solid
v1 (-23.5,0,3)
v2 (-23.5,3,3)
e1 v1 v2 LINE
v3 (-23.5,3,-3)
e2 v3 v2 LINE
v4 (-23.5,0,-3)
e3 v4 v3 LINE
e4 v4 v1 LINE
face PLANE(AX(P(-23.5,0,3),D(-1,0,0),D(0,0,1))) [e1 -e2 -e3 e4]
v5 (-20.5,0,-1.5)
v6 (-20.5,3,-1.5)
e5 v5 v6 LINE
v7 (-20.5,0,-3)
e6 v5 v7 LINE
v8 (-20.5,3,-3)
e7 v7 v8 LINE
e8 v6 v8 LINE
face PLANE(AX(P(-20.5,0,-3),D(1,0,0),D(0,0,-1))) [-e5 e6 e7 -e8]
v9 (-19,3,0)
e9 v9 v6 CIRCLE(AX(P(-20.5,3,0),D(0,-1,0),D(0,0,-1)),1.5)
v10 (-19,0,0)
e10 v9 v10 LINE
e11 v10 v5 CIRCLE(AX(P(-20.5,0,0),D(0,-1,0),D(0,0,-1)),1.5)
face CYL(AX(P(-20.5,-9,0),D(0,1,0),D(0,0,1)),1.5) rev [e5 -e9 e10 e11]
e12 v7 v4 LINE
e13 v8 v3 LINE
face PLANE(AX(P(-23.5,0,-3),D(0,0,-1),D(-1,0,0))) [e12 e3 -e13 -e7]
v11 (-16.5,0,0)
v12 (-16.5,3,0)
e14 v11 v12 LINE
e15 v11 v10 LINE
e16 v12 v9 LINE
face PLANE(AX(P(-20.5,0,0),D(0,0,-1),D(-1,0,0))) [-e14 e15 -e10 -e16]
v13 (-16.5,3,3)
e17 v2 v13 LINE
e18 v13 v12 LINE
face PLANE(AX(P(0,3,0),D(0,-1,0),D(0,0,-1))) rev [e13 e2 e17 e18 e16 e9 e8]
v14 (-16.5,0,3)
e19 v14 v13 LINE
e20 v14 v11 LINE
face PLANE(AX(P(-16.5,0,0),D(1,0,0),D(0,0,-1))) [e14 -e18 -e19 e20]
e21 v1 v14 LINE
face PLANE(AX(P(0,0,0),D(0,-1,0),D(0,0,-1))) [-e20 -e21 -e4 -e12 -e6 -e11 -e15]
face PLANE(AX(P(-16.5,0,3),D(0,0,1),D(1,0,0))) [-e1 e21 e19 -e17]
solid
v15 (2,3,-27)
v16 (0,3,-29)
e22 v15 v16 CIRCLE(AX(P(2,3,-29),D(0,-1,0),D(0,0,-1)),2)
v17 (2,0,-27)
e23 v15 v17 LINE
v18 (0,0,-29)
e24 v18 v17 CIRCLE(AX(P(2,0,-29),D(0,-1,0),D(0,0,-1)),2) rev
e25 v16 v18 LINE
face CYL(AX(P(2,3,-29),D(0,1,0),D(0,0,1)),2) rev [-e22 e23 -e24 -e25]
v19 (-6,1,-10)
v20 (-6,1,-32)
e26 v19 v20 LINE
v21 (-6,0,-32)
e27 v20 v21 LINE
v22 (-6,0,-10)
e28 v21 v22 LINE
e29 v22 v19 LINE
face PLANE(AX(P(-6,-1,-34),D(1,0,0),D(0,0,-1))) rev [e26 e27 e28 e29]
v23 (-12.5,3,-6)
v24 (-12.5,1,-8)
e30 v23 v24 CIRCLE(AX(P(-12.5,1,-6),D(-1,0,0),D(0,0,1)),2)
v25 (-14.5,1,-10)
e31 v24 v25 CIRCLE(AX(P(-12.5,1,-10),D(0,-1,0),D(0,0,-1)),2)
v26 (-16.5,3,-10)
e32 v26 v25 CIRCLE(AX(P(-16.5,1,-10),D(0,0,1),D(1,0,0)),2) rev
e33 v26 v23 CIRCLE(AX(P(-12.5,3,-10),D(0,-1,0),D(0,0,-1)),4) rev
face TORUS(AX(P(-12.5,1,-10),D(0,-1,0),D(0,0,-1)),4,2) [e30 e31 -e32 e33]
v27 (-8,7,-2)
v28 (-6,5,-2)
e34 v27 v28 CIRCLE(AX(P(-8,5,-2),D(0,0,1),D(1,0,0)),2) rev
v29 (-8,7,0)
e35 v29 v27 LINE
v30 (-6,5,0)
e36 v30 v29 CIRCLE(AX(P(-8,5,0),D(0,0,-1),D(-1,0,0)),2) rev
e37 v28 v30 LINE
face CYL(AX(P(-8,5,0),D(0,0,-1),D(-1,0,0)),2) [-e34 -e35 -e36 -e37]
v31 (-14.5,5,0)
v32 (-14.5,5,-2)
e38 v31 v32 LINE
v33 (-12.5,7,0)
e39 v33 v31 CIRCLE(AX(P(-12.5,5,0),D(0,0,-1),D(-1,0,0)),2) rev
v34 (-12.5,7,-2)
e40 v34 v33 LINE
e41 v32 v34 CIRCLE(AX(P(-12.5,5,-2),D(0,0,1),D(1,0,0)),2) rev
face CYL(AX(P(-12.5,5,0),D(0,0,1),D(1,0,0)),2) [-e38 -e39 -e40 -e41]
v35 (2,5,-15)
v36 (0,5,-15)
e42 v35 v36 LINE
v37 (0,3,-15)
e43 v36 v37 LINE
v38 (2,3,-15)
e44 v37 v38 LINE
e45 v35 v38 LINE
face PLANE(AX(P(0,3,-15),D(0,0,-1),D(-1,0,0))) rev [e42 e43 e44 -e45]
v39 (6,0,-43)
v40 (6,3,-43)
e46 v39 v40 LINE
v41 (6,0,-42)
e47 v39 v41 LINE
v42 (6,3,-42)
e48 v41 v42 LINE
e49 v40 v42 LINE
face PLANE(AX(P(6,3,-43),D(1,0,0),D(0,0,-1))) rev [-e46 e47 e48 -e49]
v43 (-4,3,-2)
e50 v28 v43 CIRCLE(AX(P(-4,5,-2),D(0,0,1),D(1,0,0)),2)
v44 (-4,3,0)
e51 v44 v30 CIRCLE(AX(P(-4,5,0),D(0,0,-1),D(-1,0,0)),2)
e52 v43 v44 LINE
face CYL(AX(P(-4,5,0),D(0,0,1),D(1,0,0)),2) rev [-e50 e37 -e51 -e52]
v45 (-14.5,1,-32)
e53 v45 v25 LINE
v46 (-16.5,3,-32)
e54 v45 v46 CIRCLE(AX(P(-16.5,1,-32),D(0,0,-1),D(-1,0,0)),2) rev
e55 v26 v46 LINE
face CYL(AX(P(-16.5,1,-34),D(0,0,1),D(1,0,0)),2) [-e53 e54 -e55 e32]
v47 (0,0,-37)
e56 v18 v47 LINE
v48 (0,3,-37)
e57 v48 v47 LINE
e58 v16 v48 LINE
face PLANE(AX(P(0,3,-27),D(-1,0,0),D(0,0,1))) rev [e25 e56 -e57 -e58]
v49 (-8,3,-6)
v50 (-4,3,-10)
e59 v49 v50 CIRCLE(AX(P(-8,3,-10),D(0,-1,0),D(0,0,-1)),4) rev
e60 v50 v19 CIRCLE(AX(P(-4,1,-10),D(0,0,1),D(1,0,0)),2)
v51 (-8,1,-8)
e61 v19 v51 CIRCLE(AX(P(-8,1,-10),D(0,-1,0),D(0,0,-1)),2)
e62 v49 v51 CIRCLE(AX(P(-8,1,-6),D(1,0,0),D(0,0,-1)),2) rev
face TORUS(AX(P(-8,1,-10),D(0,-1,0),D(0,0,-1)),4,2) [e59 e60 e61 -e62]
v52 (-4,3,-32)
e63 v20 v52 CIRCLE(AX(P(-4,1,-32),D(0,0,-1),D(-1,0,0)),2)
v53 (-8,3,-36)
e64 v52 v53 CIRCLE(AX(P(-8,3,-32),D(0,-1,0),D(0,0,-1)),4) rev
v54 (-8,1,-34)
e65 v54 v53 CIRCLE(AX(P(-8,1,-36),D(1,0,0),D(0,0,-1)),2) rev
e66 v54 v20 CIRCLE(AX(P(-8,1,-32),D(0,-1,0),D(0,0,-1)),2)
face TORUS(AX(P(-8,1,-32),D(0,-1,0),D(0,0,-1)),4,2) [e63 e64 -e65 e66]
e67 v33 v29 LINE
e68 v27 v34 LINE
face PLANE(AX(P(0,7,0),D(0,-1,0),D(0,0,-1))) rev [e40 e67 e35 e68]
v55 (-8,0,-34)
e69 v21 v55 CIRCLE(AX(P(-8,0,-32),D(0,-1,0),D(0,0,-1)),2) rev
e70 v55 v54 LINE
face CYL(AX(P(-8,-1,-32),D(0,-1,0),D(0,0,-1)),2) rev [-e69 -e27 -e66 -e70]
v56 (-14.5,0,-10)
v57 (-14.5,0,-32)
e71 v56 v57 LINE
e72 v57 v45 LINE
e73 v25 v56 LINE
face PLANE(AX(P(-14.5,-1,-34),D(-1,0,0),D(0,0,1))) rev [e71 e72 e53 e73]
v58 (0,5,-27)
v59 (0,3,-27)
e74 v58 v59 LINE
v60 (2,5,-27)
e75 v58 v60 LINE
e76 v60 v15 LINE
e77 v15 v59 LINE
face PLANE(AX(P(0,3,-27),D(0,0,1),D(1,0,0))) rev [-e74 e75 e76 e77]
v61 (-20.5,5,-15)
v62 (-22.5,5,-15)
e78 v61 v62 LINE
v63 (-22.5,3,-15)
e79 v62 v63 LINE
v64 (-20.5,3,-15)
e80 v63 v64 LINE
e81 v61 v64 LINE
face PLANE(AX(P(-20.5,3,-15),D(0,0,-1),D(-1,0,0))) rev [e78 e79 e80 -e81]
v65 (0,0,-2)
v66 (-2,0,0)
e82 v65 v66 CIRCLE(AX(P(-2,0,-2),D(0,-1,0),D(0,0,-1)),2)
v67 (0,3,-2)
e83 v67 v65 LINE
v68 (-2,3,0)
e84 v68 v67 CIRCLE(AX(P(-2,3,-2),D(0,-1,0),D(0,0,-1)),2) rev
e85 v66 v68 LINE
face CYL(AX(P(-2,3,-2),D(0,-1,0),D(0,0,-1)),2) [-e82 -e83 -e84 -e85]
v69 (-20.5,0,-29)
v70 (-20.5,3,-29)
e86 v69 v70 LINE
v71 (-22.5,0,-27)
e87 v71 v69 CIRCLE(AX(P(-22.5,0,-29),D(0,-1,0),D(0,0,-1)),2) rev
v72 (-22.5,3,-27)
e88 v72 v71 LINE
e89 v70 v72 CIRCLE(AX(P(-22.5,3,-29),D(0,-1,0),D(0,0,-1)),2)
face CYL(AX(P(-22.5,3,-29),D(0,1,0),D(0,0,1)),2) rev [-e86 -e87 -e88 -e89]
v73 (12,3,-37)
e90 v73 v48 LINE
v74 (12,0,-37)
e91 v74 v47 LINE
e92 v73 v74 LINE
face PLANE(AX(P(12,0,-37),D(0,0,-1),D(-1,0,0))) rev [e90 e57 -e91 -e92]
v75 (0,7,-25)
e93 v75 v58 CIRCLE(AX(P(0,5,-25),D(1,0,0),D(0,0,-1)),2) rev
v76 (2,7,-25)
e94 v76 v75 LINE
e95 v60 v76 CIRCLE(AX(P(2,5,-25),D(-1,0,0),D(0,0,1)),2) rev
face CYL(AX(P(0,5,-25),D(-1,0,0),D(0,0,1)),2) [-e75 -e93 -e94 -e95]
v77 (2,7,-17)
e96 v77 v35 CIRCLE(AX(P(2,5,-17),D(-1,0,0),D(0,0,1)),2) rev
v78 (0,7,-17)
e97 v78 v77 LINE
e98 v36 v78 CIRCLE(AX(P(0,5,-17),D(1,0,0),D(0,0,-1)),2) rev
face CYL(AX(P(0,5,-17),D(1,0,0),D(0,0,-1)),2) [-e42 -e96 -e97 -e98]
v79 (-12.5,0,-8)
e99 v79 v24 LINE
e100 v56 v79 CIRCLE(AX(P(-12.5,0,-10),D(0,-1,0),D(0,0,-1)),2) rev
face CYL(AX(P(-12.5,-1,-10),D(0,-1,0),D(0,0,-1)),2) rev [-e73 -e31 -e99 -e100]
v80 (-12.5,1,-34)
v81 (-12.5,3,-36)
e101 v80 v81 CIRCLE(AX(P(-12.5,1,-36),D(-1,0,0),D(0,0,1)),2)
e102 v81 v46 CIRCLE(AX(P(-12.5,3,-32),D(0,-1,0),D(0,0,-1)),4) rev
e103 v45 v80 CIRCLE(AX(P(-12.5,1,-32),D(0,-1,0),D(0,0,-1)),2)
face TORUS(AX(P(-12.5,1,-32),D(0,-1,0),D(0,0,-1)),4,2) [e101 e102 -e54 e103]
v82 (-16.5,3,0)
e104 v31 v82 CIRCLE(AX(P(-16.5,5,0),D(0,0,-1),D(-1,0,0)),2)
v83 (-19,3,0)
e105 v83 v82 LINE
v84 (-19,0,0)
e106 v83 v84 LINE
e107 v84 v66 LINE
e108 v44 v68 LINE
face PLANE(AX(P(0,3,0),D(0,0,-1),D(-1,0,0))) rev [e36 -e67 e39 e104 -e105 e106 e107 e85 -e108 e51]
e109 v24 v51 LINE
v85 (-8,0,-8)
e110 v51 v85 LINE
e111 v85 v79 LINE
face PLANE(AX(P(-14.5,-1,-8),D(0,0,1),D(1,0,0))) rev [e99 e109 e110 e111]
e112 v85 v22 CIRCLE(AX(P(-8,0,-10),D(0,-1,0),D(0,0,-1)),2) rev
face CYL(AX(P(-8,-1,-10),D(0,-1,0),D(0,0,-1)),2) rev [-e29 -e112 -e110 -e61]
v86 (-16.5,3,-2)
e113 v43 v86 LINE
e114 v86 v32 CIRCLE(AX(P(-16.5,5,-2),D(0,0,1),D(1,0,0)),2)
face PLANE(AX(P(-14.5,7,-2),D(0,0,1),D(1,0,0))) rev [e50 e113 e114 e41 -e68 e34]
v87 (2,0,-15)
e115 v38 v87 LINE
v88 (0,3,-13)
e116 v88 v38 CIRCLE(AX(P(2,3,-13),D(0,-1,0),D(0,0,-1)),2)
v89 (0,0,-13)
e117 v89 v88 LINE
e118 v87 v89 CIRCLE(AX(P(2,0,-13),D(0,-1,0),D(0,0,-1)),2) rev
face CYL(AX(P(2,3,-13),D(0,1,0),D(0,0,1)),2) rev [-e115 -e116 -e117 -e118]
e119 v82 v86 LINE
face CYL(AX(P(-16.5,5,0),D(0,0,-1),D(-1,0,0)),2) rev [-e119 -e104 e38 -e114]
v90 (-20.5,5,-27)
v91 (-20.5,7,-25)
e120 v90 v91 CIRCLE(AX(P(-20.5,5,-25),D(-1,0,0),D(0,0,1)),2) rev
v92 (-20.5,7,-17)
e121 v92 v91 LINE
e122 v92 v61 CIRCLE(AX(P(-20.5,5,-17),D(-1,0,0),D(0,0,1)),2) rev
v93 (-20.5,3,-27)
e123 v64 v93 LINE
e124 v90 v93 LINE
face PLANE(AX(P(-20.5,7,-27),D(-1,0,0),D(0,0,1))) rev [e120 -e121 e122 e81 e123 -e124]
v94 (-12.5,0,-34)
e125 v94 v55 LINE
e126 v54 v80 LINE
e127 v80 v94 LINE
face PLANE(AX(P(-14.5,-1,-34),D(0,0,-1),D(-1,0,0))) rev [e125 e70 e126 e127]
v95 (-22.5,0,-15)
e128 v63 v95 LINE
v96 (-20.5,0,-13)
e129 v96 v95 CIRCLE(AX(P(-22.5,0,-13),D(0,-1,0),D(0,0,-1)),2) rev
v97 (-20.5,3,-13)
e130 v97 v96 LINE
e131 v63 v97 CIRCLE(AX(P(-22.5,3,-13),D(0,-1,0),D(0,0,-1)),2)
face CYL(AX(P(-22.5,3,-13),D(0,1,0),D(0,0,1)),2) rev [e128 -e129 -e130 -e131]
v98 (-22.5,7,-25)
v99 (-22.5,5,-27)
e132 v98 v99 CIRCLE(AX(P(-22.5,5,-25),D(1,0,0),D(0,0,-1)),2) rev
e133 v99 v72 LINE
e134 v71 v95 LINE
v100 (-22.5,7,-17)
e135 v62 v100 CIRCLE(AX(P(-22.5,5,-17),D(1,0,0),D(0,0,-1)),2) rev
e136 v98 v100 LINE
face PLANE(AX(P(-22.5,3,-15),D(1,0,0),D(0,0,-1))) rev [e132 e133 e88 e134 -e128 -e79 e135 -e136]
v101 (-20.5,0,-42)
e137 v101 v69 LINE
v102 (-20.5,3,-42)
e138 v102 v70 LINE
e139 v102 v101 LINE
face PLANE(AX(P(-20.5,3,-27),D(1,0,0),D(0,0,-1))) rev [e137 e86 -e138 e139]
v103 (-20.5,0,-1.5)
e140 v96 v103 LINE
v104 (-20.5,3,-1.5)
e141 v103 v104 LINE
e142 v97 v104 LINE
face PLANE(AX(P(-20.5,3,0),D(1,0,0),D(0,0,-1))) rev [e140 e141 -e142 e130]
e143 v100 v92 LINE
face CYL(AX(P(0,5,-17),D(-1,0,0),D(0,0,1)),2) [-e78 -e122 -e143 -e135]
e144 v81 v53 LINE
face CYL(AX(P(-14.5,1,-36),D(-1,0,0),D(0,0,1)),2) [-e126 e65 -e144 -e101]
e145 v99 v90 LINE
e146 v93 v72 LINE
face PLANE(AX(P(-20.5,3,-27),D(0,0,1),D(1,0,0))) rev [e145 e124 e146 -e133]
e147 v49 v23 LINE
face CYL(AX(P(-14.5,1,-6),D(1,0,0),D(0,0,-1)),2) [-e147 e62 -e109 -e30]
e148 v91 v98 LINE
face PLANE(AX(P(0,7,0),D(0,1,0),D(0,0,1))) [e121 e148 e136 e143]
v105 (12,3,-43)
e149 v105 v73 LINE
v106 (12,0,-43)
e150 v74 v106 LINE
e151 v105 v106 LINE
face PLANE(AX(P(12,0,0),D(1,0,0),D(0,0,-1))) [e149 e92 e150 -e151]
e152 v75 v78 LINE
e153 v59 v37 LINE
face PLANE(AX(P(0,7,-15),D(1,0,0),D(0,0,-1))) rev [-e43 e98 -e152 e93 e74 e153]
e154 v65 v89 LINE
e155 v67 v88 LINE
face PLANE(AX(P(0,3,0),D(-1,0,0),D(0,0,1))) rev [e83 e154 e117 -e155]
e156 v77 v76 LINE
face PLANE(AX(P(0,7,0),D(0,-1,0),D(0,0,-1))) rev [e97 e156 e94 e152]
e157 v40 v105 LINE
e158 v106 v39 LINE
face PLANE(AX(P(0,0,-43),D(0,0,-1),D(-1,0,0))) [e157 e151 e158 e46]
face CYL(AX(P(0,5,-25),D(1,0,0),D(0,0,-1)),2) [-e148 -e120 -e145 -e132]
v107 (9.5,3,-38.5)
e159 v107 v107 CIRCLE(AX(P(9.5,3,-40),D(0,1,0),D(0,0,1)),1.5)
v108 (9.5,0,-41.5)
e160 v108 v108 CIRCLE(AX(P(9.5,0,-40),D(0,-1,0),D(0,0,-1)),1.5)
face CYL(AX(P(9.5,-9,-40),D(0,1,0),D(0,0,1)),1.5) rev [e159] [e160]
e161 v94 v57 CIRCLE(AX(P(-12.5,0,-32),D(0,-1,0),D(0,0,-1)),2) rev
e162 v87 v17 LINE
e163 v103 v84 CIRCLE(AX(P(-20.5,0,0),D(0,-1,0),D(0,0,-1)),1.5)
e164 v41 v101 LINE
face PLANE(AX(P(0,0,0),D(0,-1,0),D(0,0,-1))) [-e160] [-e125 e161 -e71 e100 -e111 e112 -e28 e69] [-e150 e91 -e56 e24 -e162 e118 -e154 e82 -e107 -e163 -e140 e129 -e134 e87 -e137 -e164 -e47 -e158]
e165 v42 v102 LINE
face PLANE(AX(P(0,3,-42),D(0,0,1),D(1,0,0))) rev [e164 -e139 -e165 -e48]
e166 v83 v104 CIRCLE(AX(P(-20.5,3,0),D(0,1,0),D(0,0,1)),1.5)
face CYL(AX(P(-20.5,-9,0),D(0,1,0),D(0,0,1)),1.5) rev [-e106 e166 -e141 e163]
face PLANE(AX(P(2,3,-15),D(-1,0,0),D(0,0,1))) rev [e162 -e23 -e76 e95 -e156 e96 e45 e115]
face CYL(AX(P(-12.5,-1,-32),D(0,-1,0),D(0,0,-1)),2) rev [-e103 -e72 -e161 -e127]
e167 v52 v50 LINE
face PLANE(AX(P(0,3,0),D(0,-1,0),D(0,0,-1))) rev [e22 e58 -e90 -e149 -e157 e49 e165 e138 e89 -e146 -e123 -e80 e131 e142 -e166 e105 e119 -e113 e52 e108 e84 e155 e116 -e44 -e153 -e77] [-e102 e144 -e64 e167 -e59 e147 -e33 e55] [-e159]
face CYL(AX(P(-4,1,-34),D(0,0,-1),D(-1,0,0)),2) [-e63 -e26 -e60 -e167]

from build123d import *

# Parameters (mm, degrees)
EXTRUDE_1_DEPTH     = 3
SKETCH_3_W          = 8.5
SKETCH_3_H          = 2
EXTRUDE_2_DEPTH     = 4
SKETCH_4_W          = 2
SKETCH_4_H          = 12
EXTRUDE_3_DEPTH     = 4
FILLET_1_R          = 2
FILLET_2_R          = 2
FILLET_3_R          = 2
SKETCH_5_W          = 8.5
SKETCH_5_H          = 26
CUT_EXTRUDE_1_DEPTH = 4
FILLET_4_R          = 2
EXTRUDE_4_DEPTH     = 3
SKETCH_9_W          = 5
SKETCH_9_H          = 3
EXTRUDE_5_DEPTH     = 12
SKETCH_8_R          = 1.5
CUT_EXTRUDE_2_DEPTH = 12
SKETCH_10_W         = 6
SKETCH_10_H         = 3
EXTRUDE_6_DEPTH     = 1


with BuildPart() as part:
    # 草图1 → 凸台-拉伸1 (new body)
    with BuildSketch(Plane(origin=(0, 0, 0), x_dir=(1, 0, 0), z_dir=(0, 1, 0))):
        Polygon((0, 0), (-20.5, 0), (-20.5, 15), (-22.5, 15), (-22.5, 27), (-20.5, 27), (-20.5, 42), (0, 42), (0, 27), (2, 27), (2, 15), (0, 15), align=None)
    extrude(amount=EXTRUDE_1_DEPTH)

    # 草图3 → 凸台-拉伸2 (add)
    with BuildSketch(Plane(origin=(0, 3, 0), x_dir=(1, 0, 0), z_dir=(0, 1, 0))):
        with Locations((-10.25, 1)):
            Rectangle(SKETCH_3_W, SKETCH_3_H)
    extrude(amount=EXTRUDE_2_DEPTH)

    # 草图4 → 凸台-拉伸3 (add)
    with BuildSketch(Plane(origin=(0, 3, 0), x_dir=(1, 0, 0), z_dir=(0, 1, 0))):
        with Locations((-21.5, 21)):
            Rectangle(SKETCH_4_W, SKETCH_4_H)
        with Locations((1, 21)):
            Rectangle(SKETCH_4_W, SKETCH_4_H)
    extrude(amount=EXTRUDE_3_DEPTH)

    # 圆角1
    fillet_1_edges = [part.edges().sort_by_distance(p)[0] for p in [
        (-14.5, 7, -1),
        (-6, 7, -1),
        (-21.5, 7, -15),
        (-21.5, 7, -27),
        (1, 7, -15),
        (1, 7, -27),
    ]]
    fillet(fillet_1_edges, radius=FILLET_1_R)

    # 圆角2
    fillet_2_edges = [part.edges().sort_by_distance(p)[0] for p in [
        (0, 1.5, 0),
    ]]
    fillet(fillet_2_edges, radius=FILLET_2_R)

    # 圆角3
    # the kernel refuses this fillet: 2 mm, written as the material it adds along each edge
    with BuildSketch(Plane(origin=(-6, 3, 0), x_dir=(1, 0, 0), z_dir=(0, 0, -1)), Plane(origin=(-14.5, 3, -2), x_dir=(-1, 0, 0), z_dir=(0, 0, 1))) as fillet_3_piece_1:
        with BuildLine():
            CenterArc((FILLET_3_R, -FILLET_3_R), FILLET_3_R, 90, 90)
            Line((0, -FILLET_3_R), (0, 0))
            Line((0, 0), (FILLET_3_R, 0))
        make_face()
    extrude(amount=2)
    with BuildSketch(Plane(origin=(-20.5, 0, -15), x_dir=(0, 0, 1), z_dir=(0, 1, 0)), Plane(origin=(0, 0, -27), x_dir=(0, 0, -1), z_dir=(0, 1, 0))) as fillet_3_piece_2:
        with BuildLine():
            CenterArc((FILLET_3_R, -FILLET_3_R), FILLET_3_R, 90, 90)
            Line((0, -FILLET_3_R), (0, 0))
            Line((0, 0), (FILLET_3_R, 0))
        make_face()
    extrude(amount=3)
    with BuildSketch(Plane(origin=(-20.5, 0, -27), x_dir=(0, 0, -1), z_dir=(0, 1, 0)), Plane(origin=(0, 0, -15), x_dir=(0, 0, 1), z_dir=(0, 1, 0))) as fillet_3_piece_3:
        with BuildLine():
            CenterArc((FILLET_3_R, FILLET_3_R), FILLET_3_R, 180, 90)
            Line((0, FILLET_3_R), (0, 0))
            Line((0, 0), (FILLET_3_R, 0))
        make_face()
    extrude(amount=3)

    # 草图5 → 切除-拉伸1 (cut)
    with BuildSketch(Plane(origin=(0, 3, 0), x_dir=(1, 0, 0), z_dir=(0, 1, 0))):
        with Locations((-10.25, 21)):
            Rectangle(SKETCH_5_W, SKETCH_5_H)
    extrude(amount=-CUT_EXTRUDE_1_DEPTH, mode=Mode.SUBTRACT)

    # 圆角4
    fillet_4_edges = [part.edges().sort_by_distance(p)[0] for p in [
        (-14.5, 1.5, -8),
        (-14.5, 1.5, -34),
        (-6, 1.5, -34),
        (-6, 1.5, -8),
        (-14.5, 3, -21),
        (-10.25, 3, -8),
        (-6, 3, -21),
        (-10.25, 3, -34),
    ]]
    fillet(fillet_4_edges, radius=FILLET_4_R)

    # 草图9 → 凸台-拉伸5 (add)
    with BuildSketch(Plane(origin=(0, 0, 0), x_dir=(0, 0, -1), z_dir=(1, 0, 0))):
        with Locations((39.5, 1.5)):
            Rectangle(SKETCH_9_W, SKETCH_9_H)
    extrude(amount=EXTRUDE_5_DEPTH)


with BuildPart() as body_2:
    # 草图7 → 凸台-拉伸4 (new body)
    with BuildSketch(Plane(origin=(0, 3, 0), x_dir=(1, 0, 0), z_dir=(0, 1, 0))):
        Polygon((-16.5, 0), (-16.5, -3), (-23.5, -3), (-23.5, 3), (-20.5, 3), (-20.5, 0), align=None)
    extrude(amount=-EXTRUDE_4_DEPTH)


with BuildPart() as cut_extrude_2_tool:
    # 草图8 → 切除-拉伸2 (new body)
    with BuildSketch(Plane(origin=(0, 3, 0), x_dir=(1, 0, 0), z_dir=(0, 1, 0))):
        with Locations((-20.5, 0)):
            Circle(SKETCH_8_R)
        with Locations(Location((9.5, 40, 0), (0, 0, 270))):
            Circle(SKETCH_8_R)
    extrude(amount=-CUT_EXTRUDE_2_DEPTH)


with BuildPart() as part_1:
    add(part.part)

    # 切除-拉伸2: cut by cut_extrude_2_tool
    add(cut_extrude_2_tool.part, mode=Mode.SUBTRACT)

    # 草图10 → 凸台-拉伸6 (add)
    with BuildSketch(Plane(origin=(0, 0, -42), x_dir=(-1, 0, 0), z_dir=(0, 0, -1))):
        with Locations((-9, 1.5)):
            Rectangle(SKETCH_10_W, SKETCH_10_H)
    extrude(amount=EXTRUDE_6_DEPTH)


with BuildPart() as body_2_1:
    add(body_2.part)

    # 切除-拉伸2: cut by cut_extrude_2_tool
    add(cut_extrude_2_tool.part, mode=Mode.SUBTRACT)


solid = Compound([part_1.part, body_2_1.part])
